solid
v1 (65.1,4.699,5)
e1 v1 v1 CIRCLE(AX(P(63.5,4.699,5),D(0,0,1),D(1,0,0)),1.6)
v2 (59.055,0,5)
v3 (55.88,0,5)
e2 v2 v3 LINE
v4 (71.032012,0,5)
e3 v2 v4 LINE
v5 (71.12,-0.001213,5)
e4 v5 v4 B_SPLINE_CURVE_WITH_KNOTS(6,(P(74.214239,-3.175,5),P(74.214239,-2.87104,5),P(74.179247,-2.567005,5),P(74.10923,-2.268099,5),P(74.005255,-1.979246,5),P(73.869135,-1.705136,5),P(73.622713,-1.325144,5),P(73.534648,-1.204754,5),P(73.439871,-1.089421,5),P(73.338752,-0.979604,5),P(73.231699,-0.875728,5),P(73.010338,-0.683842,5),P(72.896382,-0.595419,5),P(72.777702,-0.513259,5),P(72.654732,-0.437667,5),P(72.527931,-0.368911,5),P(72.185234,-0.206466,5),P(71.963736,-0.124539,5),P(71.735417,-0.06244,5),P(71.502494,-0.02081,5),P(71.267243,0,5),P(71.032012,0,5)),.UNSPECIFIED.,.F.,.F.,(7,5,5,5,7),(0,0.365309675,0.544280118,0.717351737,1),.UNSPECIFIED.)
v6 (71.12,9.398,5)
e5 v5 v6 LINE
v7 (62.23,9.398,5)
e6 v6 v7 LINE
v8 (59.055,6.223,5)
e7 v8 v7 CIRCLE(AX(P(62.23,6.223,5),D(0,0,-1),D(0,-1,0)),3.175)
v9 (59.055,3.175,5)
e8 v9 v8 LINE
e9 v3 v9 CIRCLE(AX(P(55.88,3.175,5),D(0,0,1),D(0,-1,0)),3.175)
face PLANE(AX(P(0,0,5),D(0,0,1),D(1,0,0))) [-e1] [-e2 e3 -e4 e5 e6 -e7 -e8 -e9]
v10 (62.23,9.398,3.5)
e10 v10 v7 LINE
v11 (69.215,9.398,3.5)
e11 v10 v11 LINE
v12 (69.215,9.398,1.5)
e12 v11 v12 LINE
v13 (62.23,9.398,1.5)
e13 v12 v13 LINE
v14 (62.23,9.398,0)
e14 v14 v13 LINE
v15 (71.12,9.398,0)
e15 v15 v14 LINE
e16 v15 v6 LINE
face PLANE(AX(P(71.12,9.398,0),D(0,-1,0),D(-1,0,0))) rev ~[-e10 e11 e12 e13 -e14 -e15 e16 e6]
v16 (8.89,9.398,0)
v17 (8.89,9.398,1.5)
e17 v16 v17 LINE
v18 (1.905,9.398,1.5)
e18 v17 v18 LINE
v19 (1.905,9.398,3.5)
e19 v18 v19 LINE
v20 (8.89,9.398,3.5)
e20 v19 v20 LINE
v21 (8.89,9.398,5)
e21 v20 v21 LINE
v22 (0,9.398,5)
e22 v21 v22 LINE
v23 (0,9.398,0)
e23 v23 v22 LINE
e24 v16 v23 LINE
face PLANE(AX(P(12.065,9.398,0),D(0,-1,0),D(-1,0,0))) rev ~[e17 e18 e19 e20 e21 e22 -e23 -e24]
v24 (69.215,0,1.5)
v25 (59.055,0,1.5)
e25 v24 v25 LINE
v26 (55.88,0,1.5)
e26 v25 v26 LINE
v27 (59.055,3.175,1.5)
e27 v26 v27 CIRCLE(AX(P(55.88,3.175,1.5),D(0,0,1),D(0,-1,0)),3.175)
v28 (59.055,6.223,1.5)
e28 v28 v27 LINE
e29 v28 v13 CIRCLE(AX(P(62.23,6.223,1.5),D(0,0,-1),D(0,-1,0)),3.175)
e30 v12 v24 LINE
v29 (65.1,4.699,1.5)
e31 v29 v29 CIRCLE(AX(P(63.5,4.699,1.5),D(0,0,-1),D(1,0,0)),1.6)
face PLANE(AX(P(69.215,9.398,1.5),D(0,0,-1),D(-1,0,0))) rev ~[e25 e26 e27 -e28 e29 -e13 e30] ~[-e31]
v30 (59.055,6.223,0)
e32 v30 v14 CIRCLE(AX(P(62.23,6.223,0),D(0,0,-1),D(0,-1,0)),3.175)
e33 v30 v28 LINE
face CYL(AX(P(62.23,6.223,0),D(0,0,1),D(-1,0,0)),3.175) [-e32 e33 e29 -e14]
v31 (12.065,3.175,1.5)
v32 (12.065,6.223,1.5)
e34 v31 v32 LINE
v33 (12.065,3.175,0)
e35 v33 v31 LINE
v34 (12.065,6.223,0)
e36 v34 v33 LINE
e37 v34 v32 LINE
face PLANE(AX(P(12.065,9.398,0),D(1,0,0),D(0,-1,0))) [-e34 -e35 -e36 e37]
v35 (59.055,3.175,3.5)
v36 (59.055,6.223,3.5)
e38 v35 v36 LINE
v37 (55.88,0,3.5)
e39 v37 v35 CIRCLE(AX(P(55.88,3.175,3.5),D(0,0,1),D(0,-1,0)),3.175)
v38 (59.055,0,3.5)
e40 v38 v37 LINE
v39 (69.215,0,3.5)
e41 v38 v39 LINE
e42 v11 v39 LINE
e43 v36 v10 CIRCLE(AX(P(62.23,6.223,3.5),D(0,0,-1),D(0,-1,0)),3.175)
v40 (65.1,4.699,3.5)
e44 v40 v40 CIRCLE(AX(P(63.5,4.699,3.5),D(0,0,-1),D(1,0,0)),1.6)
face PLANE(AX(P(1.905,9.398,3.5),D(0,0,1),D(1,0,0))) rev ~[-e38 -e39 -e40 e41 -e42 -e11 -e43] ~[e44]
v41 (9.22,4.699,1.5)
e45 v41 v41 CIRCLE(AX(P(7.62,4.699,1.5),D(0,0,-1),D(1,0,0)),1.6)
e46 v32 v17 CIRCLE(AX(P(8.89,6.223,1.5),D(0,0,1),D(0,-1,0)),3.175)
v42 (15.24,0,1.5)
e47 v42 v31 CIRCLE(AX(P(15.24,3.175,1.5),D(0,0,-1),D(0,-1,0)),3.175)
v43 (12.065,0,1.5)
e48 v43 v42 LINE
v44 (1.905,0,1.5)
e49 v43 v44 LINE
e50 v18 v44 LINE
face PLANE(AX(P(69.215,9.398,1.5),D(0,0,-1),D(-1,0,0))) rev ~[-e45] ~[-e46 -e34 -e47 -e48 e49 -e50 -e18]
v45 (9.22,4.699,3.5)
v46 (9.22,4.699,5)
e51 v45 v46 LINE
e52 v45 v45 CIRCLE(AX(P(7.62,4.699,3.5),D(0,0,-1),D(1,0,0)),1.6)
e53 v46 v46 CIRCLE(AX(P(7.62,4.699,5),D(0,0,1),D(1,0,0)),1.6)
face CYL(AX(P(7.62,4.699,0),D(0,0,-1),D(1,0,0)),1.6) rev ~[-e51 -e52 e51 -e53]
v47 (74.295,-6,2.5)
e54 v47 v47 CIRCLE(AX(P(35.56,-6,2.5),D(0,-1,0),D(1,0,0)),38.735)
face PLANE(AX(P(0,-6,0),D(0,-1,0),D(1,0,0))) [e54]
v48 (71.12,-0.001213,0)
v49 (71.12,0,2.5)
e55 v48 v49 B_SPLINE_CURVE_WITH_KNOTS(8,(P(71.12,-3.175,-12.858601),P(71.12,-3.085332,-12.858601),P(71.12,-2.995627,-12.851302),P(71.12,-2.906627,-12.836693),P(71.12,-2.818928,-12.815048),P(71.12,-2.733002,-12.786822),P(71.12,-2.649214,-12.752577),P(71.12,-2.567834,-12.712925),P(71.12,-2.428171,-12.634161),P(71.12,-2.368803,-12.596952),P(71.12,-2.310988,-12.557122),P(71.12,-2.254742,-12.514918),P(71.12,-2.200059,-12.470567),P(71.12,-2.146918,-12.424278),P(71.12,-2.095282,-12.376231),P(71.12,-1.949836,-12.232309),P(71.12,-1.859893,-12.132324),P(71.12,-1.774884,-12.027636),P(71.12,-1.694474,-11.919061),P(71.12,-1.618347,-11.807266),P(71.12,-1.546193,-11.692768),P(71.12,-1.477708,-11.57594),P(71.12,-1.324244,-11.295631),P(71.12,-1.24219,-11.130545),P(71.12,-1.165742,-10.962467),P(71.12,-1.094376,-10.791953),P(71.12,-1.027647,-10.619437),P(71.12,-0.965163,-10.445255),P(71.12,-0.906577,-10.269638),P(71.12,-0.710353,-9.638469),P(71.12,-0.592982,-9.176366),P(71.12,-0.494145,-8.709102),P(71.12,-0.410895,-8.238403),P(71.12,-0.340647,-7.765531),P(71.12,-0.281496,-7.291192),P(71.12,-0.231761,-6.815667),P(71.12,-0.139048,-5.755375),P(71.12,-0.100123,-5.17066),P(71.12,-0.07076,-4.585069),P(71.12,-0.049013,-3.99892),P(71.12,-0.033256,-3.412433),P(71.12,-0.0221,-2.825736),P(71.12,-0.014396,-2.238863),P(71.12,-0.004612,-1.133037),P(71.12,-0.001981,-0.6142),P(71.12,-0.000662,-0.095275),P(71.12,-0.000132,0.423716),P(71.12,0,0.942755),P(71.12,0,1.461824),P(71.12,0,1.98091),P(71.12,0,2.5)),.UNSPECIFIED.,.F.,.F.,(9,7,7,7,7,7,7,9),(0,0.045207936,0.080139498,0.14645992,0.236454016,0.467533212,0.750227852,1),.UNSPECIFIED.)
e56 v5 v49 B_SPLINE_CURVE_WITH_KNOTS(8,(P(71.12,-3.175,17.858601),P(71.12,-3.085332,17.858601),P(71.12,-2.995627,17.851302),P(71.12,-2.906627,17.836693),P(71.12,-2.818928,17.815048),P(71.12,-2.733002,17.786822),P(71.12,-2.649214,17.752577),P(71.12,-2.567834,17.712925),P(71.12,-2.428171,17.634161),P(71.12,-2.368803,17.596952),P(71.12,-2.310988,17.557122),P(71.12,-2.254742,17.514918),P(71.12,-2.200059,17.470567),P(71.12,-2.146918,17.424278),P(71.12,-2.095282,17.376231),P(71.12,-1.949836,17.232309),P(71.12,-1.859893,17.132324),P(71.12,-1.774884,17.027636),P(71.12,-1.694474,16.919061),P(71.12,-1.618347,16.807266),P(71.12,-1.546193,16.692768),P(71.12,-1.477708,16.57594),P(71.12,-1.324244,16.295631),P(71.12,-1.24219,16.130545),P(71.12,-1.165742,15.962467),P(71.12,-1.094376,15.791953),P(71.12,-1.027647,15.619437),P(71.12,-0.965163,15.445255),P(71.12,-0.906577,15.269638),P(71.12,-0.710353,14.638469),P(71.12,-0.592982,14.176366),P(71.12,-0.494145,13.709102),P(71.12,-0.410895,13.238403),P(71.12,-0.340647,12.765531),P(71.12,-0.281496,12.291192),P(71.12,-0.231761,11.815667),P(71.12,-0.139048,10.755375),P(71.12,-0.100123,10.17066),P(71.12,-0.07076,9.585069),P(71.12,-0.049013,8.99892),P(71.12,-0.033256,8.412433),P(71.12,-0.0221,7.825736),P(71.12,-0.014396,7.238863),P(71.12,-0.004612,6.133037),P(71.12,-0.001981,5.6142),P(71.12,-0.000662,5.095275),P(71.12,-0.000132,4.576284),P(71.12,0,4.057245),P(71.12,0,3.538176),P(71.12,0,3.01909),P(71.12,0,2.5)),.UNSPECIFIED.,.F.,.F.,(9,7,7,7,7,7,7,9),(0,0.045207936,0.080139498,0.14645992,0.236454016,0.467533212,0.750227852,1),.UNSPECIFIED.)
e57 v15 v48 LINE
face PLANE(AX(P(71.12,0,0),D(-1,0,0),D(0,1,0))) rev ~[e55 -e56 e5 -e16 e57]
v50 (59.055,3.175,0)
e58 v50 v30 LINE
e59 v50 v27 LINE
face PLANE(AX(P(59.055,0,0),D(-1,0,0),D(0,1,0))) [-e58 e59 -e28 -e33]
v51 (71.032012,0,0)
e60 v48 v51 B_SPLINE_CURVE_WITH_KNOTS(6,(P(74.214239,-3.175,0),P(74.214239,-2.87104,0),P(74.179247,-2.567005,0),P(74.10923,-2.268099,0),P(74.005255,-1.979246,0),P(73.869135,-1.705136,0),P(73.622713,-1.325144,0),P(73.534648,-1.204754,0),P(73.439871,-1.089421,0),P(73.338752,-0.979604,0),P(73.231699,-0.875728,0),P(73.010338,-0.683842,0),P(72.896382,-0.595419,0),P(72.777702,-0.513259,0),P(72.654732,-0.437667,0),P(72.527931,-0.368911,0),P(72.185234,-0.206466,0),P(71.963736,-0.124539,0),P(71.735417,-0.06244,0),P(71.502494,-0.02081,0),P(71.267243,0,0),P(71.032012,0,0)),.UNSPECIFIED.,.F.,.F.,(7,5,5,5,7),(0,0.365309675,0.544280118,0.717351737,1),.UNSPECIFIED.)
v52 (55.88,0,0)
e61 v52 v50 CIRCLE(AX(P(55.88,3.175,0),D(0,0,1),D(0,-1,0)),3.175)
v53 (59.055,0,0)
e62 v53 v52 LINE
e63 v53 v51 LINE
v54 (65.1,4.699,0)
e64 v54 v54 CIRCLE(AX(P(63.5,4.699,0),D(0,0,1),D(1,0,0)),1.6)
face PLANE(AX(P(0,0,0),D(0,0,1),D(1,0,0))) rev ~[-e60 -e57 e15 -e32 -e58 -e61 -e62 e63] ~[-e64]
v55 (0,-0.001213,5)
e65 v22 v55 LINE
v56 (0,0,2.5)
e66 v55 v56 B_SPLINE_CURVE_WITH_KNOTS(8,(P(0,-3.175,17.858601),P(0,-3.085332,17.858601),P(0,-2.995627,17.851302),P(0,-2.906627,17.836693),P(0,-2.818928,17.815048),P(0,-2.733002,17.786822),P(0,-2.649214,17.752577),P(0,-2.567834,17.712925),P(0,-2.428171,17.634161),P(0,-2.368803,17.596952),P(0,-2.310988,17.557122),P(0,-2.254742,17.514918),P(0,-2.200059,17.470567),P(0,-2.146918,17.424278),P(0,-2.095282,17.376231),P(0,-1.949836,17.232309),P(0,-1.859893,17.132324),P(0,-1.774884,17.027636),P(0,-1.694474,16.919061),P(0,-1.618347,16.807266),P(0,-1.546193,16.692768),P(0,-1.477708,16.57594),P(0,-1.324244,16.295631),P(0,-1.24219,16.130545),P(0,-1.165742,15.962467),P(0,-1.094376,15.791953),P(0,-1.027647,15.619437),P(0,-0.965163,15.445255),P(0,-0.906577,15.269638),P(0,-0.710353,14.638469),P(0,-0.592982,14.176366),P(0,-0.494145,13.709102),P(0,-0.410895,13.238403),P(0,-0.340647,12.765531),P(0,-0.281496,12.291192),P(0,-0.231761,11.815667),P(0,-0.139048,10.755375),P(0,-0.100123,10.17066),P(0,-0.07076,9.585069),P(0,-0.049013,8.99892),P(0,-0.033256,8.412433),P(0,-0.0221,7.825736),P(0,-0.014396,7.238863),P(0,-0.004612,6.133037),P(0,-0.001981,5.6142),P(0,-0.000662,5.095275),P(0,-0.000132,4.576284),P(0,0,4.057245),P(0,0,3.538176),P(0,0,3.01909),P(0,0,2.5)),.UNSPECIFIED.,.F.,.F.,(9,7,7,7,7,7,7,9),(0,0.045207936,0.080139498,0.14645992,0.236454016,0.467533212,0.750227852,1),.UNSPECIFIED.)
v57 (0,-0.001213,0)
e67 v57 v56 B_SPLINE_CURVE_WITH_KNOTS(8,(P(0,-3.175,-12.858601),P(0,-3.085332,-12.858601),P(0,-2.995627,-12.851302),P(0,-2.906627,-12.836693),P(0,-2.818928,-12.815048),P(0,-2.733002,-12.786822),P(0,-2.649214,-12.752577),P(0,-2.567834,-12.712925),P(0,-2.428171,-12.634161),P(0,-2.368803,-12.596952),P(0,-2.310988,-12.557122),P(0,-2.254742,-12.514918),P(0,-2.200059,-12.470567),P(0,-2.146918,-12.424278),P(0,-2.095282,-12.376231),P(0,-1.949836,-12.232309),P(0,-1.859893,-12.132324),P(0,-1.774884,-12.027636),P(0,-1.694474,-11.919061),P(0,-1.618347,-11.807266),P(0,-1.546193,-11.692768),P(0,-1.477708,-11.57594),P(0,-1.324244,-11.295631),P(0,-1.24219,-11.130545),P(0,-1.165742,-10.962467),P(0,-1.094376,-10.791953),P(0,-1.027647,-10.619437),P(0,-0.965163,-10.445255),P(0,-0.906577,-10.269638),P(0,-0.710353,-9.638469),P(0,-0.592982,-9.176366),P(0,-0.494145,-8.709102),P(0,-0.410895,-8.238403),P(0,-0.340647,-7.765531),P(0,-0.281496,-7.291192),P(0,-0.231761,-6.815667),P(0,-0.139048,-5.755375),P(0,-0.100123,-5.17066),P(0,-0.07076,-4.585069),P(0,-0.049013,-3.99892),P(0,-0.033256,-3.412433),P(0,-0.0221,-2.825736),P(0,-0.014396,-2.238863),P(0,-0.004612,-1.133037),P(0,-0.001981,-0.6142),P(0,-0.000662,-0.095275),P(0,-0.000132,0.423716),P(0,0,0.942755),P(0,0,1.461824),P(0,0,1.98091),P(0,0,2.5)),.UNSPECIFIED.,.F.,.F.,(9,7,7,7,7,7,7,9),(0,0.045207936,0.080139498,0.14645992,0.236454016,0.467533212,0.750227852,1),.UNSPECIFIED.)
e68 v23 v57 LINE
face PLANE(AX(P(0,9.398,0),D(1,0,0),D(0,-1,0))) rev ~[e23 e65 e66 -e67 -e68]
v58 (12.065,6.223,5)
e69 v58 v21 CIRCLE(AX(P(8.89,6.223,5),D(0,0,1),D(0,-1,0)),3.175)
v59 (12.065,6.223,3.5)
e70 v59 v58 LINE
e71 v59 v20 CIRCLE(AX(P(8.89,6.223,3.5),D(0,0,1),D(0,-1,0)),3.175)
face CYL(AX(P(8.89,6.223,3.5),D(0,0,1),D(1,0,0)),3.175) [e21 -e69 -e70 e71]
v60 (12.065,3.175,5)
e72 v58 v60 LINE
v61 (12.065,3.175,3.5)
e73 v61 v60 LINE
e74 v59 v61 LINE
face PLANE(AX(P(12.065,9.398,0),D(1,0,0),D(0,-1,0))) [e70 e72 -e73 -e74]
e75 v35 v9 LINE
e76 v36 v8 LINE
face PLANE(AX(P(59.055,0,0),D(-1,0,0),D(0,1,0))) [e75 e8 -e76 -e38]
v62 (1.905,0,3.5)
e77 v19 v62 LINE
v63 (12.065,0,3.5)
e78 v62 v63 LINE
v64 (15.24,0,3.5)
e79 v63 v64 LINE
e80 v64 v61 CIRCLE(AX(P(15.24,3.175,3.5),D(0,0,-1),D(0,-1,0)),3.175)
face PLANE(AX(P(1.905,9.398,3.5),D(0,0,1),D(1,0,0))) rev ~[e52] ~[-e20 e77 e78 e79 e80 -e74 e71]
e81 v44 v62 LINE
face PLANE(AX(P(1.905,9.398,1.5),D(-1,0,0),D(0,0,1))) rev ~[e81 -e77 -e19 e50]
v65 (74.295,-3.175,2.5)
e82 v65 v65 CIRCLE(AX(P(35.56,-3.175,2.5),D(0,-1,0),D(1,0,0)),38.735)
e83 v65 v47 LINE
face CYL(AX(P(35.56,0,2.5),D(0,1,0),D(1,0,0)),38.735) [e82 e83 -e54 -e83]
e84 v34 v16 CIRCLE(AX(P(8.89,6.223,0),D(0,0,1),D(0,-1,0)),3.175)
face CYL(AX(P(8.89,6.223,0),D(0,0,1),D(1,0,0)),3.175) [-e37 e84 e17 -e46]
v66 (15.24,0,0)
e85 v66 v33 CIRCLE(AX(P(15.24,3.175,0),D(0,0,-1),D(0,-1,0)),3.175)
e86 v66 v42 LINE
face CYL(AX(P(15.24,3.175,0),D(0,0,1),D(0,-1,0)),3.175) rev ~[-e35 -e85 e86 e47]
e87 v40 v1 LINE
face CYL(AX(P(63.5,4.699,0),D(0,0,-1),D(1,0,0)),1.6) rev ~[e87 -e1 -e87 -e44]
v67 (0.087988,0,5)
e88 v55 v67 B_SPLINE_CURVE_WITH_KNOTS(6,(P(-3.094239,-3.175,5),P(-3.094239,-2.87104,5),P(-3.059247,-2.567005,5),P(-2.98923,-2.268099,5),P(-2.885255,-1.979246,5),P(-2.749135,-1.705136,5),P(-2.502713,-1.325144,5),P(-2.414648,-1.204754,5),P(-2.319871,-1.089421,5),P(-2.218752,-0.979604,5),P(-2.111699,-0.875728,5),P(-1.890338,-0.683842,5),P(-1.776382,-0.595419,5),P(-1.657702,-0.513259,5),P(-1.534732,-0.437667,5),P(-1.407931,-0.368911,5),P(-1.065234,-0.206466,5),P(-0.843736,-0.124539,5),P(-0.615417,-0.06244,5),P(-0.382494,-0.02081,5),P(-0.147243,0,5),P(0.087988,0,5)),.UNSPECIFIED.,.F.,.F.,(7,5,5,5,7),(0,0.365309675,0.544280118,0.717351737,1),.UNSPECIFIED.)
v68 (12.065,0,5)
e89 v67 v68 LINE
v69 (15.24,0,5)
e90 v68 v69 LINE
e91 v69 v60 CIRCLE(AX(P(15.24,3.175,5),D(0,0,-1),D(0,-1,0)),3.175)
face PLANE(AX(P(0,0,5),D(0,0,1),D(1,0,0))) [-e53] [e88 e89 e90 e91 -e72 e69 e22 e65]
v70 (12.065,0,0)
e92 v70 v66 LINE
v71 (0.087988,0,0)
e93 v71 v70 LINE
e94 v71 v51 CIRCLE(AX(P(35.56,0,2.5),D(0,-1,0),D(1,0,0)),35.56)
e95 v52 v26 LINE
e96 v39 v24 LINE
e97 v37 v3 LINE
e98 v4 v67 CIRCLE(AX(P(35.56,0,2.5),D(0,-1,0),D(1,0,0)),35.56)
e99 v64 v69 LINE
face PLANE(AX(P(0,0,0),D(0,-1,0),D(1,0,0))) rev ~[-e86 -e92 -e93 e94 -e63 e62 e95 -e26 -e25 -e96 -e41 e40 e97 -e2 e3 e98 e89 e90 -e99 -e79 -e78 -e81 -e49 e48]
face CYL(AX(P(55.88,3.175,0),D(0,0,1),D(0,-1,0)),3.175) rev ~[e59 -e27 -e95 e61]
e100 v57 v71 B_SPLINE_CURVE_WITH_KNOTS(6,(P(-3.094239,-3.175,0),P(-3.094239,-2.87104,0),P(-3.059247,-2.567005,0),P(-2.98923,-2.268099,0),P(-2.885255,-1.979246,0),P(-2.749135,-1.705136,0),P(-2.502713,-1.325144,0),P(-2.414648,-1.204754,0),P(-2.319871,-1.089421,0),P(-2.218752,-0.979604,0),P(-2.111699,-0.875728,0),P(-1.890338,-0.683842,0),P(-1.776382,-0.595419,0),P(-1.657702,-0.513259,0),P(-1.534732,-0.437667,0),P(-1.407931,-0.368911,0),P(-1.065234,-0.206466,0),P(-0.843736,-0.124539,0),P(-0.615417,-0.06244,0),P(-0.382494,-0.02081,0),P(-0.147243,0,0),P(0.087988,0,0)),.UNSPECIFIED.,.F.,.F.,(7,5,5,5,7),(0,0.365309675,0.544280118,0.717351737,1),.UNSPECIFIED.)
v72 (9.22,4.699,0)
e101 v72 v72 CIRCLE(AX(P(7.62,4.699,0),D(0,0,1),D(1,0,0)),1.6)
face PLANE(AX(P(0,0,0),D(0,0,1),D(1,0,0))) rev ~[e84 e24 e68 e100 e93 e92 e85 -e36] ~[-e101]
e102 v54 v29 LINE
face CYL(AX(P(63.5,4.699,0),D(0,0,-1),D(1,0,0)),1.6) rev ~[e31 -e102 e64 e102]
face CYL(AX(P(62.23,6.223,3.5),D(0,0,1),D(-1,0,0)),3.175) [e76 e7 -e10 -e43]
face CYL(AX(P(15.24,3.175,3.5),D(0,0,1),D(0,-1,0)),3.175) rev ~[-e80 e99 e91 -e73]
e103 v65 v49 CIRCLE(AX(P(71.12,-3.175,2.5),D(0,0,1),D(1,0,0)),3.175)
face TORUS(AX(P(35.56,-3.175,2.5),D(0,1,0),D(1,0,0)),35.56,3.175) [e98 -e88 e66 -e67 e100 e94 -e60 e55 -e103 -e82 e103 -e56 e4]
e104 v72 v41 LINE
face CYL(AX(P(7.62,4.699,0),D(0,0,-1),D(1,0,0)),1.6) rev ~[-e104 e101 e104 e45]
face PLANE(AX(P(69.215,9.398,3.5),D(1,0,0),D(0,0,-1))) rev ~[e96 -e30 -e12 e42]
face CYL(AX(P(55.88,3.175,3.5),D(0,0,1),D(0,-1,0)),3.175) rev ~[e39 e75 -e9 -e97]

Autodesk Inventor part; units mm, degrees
ref_plane "YZ Plane" through (0, 0, 0) normal (1, 0, 0) x (0, 1, 0)
ref_plane "XZ Plane" through (0, 0, 0) normal (0, 1, 0) x (-1, 0, 0)
ref_plane "XY Plane" through (0, 0, 0) normal (0, 0, 1) x (1, 0, 0)
sketch "Sketch1" plane through (0, 0, 0) normal (0, 0, 1) x (1, 0, 0)
  line L0 (0, 0) -> (12.065, 0)
  line L1 (71.12, 0) -> (71.12, 9.398)
  line L2 (71.12, 9.398) -> (59.055, 9.398)
  line L3 (0, 9.398) -> (0, 0)
  circle A0 centre (7.62, 4.699) radius 1.6
  circle A1 centre (63.5, 4.699) radius 1.6
  line L4 (63.5, 4.699) -> (7.62, 4.699) construction
  line L5 (12.065, 9.398) -> (12.065, 0)
  line L6 (59.055, 0) -> (59.055, 9.398)
  line L7 (59.055, 9.398) -> (12.065, 9.398) construction
  line L8 (12.065, 9.398) -> (0, 9.398)
  line L9 (12.065, 0) -> (59.055, 0) construction
  line L10 (59.055, 0) -> (71.12, 0)
  line L11 (1.905, 9.398) -> (7.62, 4.699) construction
  line L12 (1.905, 0) -> (7.62, 4.699) construction
  line L13 (63.5, 4.699) -> (69.215, 9.398) construction
  line L14 (69.215, 0) -> (63.5, 4.699) construction
  line L15 (1.905, 0) -> (1.905, 9.398) construction
  line L16 (69.215, 0) -> (69.215, 9.398) construction
  line L17 (1.905, 0) -> (0, 9.398) construction
  line L18 (69.215, 0) -> (71.12, 9.398) construction
  dimension "d0" = 3.2
  dimension "d1" = 55.88
  dimension "d2" = 71.12
  dimension "d3" = 9.398
  dimension "d5" = 67.31
  dimension "d6" = 10.16
extrude "Extrusion1" add sketch "Sketch1" along normal blind 5
sketch "Sketch2" plane through (0, 0, 0) normal (0, -1, 0) x (1, 0, 0)
  circle A0 centre (35.56, 2.5) radius 38.735
  line L0 (0, 0) -> (12.065, 0) construction
  line L1 (12.065, 0) -> (12.065, 5) construction
  line L2 (0, 5) -> (12.065, 5) construction
  line L3 (0, 0) -> (0, 5) construction
  line L4 (71.12, 0) -> (59.055, 0) construction
  line L5 (71.12, 0) -> (71.12, 5) construction
  line L6 (59.055, 5) -> (71.12, 5) construction
  line L7 (59.055, 0) -> (59.055, 5) construction
  line L8 (12.065, 5) -> (35.56, 2.5) construction
  line L9 (71.12, 5) -> (59.055, 5) projected
  line L10 (35.56, 2.5) -> (59.055, 5) construction
  line L11 (59.055, 0) -> (71.12, 0) projected
  line L12 (59.055, 0) -> (35.56, 2.5) construction
  dimension "d9" = 77.47
extrude "Extrusion2" add sketch "Sketch2" along normal blind 6
sketch "Sketch3" plane through (0, 9.398, 0) normal (0, 1, 0) x (1, 0, 0)
  line L0 (1.905, -3.5) -> (69.215, -3.5)
  line L1 (69.215, -3.5) -> (69.215, -1.5)
  line L2 (69.215, -1.5) -> (1.905, -1.5)
  line L3 (1.905, -1.5) -> (1.905, -3.5)
  line L4 (71.12, 0) -> (59.055, 0) construction
  line L5 (69.215, -1.5) -> (71.12, 0) construction
  line L6 (71.0194, -5.1196) -> (69.215, -3.5) construction
  line L7 (0, 0) -> (0, -5) construction
  line L8 (0, -5) -> (1.905, -3.5) construction
  line L9 (1.905, -1.5) -> (0, 0) construction
  dimension "d12" = 67.31
  dimension "d13" = 2
extrude "Extrusion3" cut sketch "Sketch3" against normal up to surface (9.398 mm away)
fillet "Fillet1" radius 3.175 1 edges at (-3.175, 0, 2.5)
fillet "Fillet2" radius 3.175 8 edges at (12.065, 9.398, 4.25) (12.065, 9.398, 0.75) (12.065, 0, 4.25) (12.065, 0, 0.75) (59.055, 0, 0.75) (59.055, 9.398, 0.75) (59.055, 9.398, 4.25) (59.055, 0, 4.25)
properties part number "Base"
